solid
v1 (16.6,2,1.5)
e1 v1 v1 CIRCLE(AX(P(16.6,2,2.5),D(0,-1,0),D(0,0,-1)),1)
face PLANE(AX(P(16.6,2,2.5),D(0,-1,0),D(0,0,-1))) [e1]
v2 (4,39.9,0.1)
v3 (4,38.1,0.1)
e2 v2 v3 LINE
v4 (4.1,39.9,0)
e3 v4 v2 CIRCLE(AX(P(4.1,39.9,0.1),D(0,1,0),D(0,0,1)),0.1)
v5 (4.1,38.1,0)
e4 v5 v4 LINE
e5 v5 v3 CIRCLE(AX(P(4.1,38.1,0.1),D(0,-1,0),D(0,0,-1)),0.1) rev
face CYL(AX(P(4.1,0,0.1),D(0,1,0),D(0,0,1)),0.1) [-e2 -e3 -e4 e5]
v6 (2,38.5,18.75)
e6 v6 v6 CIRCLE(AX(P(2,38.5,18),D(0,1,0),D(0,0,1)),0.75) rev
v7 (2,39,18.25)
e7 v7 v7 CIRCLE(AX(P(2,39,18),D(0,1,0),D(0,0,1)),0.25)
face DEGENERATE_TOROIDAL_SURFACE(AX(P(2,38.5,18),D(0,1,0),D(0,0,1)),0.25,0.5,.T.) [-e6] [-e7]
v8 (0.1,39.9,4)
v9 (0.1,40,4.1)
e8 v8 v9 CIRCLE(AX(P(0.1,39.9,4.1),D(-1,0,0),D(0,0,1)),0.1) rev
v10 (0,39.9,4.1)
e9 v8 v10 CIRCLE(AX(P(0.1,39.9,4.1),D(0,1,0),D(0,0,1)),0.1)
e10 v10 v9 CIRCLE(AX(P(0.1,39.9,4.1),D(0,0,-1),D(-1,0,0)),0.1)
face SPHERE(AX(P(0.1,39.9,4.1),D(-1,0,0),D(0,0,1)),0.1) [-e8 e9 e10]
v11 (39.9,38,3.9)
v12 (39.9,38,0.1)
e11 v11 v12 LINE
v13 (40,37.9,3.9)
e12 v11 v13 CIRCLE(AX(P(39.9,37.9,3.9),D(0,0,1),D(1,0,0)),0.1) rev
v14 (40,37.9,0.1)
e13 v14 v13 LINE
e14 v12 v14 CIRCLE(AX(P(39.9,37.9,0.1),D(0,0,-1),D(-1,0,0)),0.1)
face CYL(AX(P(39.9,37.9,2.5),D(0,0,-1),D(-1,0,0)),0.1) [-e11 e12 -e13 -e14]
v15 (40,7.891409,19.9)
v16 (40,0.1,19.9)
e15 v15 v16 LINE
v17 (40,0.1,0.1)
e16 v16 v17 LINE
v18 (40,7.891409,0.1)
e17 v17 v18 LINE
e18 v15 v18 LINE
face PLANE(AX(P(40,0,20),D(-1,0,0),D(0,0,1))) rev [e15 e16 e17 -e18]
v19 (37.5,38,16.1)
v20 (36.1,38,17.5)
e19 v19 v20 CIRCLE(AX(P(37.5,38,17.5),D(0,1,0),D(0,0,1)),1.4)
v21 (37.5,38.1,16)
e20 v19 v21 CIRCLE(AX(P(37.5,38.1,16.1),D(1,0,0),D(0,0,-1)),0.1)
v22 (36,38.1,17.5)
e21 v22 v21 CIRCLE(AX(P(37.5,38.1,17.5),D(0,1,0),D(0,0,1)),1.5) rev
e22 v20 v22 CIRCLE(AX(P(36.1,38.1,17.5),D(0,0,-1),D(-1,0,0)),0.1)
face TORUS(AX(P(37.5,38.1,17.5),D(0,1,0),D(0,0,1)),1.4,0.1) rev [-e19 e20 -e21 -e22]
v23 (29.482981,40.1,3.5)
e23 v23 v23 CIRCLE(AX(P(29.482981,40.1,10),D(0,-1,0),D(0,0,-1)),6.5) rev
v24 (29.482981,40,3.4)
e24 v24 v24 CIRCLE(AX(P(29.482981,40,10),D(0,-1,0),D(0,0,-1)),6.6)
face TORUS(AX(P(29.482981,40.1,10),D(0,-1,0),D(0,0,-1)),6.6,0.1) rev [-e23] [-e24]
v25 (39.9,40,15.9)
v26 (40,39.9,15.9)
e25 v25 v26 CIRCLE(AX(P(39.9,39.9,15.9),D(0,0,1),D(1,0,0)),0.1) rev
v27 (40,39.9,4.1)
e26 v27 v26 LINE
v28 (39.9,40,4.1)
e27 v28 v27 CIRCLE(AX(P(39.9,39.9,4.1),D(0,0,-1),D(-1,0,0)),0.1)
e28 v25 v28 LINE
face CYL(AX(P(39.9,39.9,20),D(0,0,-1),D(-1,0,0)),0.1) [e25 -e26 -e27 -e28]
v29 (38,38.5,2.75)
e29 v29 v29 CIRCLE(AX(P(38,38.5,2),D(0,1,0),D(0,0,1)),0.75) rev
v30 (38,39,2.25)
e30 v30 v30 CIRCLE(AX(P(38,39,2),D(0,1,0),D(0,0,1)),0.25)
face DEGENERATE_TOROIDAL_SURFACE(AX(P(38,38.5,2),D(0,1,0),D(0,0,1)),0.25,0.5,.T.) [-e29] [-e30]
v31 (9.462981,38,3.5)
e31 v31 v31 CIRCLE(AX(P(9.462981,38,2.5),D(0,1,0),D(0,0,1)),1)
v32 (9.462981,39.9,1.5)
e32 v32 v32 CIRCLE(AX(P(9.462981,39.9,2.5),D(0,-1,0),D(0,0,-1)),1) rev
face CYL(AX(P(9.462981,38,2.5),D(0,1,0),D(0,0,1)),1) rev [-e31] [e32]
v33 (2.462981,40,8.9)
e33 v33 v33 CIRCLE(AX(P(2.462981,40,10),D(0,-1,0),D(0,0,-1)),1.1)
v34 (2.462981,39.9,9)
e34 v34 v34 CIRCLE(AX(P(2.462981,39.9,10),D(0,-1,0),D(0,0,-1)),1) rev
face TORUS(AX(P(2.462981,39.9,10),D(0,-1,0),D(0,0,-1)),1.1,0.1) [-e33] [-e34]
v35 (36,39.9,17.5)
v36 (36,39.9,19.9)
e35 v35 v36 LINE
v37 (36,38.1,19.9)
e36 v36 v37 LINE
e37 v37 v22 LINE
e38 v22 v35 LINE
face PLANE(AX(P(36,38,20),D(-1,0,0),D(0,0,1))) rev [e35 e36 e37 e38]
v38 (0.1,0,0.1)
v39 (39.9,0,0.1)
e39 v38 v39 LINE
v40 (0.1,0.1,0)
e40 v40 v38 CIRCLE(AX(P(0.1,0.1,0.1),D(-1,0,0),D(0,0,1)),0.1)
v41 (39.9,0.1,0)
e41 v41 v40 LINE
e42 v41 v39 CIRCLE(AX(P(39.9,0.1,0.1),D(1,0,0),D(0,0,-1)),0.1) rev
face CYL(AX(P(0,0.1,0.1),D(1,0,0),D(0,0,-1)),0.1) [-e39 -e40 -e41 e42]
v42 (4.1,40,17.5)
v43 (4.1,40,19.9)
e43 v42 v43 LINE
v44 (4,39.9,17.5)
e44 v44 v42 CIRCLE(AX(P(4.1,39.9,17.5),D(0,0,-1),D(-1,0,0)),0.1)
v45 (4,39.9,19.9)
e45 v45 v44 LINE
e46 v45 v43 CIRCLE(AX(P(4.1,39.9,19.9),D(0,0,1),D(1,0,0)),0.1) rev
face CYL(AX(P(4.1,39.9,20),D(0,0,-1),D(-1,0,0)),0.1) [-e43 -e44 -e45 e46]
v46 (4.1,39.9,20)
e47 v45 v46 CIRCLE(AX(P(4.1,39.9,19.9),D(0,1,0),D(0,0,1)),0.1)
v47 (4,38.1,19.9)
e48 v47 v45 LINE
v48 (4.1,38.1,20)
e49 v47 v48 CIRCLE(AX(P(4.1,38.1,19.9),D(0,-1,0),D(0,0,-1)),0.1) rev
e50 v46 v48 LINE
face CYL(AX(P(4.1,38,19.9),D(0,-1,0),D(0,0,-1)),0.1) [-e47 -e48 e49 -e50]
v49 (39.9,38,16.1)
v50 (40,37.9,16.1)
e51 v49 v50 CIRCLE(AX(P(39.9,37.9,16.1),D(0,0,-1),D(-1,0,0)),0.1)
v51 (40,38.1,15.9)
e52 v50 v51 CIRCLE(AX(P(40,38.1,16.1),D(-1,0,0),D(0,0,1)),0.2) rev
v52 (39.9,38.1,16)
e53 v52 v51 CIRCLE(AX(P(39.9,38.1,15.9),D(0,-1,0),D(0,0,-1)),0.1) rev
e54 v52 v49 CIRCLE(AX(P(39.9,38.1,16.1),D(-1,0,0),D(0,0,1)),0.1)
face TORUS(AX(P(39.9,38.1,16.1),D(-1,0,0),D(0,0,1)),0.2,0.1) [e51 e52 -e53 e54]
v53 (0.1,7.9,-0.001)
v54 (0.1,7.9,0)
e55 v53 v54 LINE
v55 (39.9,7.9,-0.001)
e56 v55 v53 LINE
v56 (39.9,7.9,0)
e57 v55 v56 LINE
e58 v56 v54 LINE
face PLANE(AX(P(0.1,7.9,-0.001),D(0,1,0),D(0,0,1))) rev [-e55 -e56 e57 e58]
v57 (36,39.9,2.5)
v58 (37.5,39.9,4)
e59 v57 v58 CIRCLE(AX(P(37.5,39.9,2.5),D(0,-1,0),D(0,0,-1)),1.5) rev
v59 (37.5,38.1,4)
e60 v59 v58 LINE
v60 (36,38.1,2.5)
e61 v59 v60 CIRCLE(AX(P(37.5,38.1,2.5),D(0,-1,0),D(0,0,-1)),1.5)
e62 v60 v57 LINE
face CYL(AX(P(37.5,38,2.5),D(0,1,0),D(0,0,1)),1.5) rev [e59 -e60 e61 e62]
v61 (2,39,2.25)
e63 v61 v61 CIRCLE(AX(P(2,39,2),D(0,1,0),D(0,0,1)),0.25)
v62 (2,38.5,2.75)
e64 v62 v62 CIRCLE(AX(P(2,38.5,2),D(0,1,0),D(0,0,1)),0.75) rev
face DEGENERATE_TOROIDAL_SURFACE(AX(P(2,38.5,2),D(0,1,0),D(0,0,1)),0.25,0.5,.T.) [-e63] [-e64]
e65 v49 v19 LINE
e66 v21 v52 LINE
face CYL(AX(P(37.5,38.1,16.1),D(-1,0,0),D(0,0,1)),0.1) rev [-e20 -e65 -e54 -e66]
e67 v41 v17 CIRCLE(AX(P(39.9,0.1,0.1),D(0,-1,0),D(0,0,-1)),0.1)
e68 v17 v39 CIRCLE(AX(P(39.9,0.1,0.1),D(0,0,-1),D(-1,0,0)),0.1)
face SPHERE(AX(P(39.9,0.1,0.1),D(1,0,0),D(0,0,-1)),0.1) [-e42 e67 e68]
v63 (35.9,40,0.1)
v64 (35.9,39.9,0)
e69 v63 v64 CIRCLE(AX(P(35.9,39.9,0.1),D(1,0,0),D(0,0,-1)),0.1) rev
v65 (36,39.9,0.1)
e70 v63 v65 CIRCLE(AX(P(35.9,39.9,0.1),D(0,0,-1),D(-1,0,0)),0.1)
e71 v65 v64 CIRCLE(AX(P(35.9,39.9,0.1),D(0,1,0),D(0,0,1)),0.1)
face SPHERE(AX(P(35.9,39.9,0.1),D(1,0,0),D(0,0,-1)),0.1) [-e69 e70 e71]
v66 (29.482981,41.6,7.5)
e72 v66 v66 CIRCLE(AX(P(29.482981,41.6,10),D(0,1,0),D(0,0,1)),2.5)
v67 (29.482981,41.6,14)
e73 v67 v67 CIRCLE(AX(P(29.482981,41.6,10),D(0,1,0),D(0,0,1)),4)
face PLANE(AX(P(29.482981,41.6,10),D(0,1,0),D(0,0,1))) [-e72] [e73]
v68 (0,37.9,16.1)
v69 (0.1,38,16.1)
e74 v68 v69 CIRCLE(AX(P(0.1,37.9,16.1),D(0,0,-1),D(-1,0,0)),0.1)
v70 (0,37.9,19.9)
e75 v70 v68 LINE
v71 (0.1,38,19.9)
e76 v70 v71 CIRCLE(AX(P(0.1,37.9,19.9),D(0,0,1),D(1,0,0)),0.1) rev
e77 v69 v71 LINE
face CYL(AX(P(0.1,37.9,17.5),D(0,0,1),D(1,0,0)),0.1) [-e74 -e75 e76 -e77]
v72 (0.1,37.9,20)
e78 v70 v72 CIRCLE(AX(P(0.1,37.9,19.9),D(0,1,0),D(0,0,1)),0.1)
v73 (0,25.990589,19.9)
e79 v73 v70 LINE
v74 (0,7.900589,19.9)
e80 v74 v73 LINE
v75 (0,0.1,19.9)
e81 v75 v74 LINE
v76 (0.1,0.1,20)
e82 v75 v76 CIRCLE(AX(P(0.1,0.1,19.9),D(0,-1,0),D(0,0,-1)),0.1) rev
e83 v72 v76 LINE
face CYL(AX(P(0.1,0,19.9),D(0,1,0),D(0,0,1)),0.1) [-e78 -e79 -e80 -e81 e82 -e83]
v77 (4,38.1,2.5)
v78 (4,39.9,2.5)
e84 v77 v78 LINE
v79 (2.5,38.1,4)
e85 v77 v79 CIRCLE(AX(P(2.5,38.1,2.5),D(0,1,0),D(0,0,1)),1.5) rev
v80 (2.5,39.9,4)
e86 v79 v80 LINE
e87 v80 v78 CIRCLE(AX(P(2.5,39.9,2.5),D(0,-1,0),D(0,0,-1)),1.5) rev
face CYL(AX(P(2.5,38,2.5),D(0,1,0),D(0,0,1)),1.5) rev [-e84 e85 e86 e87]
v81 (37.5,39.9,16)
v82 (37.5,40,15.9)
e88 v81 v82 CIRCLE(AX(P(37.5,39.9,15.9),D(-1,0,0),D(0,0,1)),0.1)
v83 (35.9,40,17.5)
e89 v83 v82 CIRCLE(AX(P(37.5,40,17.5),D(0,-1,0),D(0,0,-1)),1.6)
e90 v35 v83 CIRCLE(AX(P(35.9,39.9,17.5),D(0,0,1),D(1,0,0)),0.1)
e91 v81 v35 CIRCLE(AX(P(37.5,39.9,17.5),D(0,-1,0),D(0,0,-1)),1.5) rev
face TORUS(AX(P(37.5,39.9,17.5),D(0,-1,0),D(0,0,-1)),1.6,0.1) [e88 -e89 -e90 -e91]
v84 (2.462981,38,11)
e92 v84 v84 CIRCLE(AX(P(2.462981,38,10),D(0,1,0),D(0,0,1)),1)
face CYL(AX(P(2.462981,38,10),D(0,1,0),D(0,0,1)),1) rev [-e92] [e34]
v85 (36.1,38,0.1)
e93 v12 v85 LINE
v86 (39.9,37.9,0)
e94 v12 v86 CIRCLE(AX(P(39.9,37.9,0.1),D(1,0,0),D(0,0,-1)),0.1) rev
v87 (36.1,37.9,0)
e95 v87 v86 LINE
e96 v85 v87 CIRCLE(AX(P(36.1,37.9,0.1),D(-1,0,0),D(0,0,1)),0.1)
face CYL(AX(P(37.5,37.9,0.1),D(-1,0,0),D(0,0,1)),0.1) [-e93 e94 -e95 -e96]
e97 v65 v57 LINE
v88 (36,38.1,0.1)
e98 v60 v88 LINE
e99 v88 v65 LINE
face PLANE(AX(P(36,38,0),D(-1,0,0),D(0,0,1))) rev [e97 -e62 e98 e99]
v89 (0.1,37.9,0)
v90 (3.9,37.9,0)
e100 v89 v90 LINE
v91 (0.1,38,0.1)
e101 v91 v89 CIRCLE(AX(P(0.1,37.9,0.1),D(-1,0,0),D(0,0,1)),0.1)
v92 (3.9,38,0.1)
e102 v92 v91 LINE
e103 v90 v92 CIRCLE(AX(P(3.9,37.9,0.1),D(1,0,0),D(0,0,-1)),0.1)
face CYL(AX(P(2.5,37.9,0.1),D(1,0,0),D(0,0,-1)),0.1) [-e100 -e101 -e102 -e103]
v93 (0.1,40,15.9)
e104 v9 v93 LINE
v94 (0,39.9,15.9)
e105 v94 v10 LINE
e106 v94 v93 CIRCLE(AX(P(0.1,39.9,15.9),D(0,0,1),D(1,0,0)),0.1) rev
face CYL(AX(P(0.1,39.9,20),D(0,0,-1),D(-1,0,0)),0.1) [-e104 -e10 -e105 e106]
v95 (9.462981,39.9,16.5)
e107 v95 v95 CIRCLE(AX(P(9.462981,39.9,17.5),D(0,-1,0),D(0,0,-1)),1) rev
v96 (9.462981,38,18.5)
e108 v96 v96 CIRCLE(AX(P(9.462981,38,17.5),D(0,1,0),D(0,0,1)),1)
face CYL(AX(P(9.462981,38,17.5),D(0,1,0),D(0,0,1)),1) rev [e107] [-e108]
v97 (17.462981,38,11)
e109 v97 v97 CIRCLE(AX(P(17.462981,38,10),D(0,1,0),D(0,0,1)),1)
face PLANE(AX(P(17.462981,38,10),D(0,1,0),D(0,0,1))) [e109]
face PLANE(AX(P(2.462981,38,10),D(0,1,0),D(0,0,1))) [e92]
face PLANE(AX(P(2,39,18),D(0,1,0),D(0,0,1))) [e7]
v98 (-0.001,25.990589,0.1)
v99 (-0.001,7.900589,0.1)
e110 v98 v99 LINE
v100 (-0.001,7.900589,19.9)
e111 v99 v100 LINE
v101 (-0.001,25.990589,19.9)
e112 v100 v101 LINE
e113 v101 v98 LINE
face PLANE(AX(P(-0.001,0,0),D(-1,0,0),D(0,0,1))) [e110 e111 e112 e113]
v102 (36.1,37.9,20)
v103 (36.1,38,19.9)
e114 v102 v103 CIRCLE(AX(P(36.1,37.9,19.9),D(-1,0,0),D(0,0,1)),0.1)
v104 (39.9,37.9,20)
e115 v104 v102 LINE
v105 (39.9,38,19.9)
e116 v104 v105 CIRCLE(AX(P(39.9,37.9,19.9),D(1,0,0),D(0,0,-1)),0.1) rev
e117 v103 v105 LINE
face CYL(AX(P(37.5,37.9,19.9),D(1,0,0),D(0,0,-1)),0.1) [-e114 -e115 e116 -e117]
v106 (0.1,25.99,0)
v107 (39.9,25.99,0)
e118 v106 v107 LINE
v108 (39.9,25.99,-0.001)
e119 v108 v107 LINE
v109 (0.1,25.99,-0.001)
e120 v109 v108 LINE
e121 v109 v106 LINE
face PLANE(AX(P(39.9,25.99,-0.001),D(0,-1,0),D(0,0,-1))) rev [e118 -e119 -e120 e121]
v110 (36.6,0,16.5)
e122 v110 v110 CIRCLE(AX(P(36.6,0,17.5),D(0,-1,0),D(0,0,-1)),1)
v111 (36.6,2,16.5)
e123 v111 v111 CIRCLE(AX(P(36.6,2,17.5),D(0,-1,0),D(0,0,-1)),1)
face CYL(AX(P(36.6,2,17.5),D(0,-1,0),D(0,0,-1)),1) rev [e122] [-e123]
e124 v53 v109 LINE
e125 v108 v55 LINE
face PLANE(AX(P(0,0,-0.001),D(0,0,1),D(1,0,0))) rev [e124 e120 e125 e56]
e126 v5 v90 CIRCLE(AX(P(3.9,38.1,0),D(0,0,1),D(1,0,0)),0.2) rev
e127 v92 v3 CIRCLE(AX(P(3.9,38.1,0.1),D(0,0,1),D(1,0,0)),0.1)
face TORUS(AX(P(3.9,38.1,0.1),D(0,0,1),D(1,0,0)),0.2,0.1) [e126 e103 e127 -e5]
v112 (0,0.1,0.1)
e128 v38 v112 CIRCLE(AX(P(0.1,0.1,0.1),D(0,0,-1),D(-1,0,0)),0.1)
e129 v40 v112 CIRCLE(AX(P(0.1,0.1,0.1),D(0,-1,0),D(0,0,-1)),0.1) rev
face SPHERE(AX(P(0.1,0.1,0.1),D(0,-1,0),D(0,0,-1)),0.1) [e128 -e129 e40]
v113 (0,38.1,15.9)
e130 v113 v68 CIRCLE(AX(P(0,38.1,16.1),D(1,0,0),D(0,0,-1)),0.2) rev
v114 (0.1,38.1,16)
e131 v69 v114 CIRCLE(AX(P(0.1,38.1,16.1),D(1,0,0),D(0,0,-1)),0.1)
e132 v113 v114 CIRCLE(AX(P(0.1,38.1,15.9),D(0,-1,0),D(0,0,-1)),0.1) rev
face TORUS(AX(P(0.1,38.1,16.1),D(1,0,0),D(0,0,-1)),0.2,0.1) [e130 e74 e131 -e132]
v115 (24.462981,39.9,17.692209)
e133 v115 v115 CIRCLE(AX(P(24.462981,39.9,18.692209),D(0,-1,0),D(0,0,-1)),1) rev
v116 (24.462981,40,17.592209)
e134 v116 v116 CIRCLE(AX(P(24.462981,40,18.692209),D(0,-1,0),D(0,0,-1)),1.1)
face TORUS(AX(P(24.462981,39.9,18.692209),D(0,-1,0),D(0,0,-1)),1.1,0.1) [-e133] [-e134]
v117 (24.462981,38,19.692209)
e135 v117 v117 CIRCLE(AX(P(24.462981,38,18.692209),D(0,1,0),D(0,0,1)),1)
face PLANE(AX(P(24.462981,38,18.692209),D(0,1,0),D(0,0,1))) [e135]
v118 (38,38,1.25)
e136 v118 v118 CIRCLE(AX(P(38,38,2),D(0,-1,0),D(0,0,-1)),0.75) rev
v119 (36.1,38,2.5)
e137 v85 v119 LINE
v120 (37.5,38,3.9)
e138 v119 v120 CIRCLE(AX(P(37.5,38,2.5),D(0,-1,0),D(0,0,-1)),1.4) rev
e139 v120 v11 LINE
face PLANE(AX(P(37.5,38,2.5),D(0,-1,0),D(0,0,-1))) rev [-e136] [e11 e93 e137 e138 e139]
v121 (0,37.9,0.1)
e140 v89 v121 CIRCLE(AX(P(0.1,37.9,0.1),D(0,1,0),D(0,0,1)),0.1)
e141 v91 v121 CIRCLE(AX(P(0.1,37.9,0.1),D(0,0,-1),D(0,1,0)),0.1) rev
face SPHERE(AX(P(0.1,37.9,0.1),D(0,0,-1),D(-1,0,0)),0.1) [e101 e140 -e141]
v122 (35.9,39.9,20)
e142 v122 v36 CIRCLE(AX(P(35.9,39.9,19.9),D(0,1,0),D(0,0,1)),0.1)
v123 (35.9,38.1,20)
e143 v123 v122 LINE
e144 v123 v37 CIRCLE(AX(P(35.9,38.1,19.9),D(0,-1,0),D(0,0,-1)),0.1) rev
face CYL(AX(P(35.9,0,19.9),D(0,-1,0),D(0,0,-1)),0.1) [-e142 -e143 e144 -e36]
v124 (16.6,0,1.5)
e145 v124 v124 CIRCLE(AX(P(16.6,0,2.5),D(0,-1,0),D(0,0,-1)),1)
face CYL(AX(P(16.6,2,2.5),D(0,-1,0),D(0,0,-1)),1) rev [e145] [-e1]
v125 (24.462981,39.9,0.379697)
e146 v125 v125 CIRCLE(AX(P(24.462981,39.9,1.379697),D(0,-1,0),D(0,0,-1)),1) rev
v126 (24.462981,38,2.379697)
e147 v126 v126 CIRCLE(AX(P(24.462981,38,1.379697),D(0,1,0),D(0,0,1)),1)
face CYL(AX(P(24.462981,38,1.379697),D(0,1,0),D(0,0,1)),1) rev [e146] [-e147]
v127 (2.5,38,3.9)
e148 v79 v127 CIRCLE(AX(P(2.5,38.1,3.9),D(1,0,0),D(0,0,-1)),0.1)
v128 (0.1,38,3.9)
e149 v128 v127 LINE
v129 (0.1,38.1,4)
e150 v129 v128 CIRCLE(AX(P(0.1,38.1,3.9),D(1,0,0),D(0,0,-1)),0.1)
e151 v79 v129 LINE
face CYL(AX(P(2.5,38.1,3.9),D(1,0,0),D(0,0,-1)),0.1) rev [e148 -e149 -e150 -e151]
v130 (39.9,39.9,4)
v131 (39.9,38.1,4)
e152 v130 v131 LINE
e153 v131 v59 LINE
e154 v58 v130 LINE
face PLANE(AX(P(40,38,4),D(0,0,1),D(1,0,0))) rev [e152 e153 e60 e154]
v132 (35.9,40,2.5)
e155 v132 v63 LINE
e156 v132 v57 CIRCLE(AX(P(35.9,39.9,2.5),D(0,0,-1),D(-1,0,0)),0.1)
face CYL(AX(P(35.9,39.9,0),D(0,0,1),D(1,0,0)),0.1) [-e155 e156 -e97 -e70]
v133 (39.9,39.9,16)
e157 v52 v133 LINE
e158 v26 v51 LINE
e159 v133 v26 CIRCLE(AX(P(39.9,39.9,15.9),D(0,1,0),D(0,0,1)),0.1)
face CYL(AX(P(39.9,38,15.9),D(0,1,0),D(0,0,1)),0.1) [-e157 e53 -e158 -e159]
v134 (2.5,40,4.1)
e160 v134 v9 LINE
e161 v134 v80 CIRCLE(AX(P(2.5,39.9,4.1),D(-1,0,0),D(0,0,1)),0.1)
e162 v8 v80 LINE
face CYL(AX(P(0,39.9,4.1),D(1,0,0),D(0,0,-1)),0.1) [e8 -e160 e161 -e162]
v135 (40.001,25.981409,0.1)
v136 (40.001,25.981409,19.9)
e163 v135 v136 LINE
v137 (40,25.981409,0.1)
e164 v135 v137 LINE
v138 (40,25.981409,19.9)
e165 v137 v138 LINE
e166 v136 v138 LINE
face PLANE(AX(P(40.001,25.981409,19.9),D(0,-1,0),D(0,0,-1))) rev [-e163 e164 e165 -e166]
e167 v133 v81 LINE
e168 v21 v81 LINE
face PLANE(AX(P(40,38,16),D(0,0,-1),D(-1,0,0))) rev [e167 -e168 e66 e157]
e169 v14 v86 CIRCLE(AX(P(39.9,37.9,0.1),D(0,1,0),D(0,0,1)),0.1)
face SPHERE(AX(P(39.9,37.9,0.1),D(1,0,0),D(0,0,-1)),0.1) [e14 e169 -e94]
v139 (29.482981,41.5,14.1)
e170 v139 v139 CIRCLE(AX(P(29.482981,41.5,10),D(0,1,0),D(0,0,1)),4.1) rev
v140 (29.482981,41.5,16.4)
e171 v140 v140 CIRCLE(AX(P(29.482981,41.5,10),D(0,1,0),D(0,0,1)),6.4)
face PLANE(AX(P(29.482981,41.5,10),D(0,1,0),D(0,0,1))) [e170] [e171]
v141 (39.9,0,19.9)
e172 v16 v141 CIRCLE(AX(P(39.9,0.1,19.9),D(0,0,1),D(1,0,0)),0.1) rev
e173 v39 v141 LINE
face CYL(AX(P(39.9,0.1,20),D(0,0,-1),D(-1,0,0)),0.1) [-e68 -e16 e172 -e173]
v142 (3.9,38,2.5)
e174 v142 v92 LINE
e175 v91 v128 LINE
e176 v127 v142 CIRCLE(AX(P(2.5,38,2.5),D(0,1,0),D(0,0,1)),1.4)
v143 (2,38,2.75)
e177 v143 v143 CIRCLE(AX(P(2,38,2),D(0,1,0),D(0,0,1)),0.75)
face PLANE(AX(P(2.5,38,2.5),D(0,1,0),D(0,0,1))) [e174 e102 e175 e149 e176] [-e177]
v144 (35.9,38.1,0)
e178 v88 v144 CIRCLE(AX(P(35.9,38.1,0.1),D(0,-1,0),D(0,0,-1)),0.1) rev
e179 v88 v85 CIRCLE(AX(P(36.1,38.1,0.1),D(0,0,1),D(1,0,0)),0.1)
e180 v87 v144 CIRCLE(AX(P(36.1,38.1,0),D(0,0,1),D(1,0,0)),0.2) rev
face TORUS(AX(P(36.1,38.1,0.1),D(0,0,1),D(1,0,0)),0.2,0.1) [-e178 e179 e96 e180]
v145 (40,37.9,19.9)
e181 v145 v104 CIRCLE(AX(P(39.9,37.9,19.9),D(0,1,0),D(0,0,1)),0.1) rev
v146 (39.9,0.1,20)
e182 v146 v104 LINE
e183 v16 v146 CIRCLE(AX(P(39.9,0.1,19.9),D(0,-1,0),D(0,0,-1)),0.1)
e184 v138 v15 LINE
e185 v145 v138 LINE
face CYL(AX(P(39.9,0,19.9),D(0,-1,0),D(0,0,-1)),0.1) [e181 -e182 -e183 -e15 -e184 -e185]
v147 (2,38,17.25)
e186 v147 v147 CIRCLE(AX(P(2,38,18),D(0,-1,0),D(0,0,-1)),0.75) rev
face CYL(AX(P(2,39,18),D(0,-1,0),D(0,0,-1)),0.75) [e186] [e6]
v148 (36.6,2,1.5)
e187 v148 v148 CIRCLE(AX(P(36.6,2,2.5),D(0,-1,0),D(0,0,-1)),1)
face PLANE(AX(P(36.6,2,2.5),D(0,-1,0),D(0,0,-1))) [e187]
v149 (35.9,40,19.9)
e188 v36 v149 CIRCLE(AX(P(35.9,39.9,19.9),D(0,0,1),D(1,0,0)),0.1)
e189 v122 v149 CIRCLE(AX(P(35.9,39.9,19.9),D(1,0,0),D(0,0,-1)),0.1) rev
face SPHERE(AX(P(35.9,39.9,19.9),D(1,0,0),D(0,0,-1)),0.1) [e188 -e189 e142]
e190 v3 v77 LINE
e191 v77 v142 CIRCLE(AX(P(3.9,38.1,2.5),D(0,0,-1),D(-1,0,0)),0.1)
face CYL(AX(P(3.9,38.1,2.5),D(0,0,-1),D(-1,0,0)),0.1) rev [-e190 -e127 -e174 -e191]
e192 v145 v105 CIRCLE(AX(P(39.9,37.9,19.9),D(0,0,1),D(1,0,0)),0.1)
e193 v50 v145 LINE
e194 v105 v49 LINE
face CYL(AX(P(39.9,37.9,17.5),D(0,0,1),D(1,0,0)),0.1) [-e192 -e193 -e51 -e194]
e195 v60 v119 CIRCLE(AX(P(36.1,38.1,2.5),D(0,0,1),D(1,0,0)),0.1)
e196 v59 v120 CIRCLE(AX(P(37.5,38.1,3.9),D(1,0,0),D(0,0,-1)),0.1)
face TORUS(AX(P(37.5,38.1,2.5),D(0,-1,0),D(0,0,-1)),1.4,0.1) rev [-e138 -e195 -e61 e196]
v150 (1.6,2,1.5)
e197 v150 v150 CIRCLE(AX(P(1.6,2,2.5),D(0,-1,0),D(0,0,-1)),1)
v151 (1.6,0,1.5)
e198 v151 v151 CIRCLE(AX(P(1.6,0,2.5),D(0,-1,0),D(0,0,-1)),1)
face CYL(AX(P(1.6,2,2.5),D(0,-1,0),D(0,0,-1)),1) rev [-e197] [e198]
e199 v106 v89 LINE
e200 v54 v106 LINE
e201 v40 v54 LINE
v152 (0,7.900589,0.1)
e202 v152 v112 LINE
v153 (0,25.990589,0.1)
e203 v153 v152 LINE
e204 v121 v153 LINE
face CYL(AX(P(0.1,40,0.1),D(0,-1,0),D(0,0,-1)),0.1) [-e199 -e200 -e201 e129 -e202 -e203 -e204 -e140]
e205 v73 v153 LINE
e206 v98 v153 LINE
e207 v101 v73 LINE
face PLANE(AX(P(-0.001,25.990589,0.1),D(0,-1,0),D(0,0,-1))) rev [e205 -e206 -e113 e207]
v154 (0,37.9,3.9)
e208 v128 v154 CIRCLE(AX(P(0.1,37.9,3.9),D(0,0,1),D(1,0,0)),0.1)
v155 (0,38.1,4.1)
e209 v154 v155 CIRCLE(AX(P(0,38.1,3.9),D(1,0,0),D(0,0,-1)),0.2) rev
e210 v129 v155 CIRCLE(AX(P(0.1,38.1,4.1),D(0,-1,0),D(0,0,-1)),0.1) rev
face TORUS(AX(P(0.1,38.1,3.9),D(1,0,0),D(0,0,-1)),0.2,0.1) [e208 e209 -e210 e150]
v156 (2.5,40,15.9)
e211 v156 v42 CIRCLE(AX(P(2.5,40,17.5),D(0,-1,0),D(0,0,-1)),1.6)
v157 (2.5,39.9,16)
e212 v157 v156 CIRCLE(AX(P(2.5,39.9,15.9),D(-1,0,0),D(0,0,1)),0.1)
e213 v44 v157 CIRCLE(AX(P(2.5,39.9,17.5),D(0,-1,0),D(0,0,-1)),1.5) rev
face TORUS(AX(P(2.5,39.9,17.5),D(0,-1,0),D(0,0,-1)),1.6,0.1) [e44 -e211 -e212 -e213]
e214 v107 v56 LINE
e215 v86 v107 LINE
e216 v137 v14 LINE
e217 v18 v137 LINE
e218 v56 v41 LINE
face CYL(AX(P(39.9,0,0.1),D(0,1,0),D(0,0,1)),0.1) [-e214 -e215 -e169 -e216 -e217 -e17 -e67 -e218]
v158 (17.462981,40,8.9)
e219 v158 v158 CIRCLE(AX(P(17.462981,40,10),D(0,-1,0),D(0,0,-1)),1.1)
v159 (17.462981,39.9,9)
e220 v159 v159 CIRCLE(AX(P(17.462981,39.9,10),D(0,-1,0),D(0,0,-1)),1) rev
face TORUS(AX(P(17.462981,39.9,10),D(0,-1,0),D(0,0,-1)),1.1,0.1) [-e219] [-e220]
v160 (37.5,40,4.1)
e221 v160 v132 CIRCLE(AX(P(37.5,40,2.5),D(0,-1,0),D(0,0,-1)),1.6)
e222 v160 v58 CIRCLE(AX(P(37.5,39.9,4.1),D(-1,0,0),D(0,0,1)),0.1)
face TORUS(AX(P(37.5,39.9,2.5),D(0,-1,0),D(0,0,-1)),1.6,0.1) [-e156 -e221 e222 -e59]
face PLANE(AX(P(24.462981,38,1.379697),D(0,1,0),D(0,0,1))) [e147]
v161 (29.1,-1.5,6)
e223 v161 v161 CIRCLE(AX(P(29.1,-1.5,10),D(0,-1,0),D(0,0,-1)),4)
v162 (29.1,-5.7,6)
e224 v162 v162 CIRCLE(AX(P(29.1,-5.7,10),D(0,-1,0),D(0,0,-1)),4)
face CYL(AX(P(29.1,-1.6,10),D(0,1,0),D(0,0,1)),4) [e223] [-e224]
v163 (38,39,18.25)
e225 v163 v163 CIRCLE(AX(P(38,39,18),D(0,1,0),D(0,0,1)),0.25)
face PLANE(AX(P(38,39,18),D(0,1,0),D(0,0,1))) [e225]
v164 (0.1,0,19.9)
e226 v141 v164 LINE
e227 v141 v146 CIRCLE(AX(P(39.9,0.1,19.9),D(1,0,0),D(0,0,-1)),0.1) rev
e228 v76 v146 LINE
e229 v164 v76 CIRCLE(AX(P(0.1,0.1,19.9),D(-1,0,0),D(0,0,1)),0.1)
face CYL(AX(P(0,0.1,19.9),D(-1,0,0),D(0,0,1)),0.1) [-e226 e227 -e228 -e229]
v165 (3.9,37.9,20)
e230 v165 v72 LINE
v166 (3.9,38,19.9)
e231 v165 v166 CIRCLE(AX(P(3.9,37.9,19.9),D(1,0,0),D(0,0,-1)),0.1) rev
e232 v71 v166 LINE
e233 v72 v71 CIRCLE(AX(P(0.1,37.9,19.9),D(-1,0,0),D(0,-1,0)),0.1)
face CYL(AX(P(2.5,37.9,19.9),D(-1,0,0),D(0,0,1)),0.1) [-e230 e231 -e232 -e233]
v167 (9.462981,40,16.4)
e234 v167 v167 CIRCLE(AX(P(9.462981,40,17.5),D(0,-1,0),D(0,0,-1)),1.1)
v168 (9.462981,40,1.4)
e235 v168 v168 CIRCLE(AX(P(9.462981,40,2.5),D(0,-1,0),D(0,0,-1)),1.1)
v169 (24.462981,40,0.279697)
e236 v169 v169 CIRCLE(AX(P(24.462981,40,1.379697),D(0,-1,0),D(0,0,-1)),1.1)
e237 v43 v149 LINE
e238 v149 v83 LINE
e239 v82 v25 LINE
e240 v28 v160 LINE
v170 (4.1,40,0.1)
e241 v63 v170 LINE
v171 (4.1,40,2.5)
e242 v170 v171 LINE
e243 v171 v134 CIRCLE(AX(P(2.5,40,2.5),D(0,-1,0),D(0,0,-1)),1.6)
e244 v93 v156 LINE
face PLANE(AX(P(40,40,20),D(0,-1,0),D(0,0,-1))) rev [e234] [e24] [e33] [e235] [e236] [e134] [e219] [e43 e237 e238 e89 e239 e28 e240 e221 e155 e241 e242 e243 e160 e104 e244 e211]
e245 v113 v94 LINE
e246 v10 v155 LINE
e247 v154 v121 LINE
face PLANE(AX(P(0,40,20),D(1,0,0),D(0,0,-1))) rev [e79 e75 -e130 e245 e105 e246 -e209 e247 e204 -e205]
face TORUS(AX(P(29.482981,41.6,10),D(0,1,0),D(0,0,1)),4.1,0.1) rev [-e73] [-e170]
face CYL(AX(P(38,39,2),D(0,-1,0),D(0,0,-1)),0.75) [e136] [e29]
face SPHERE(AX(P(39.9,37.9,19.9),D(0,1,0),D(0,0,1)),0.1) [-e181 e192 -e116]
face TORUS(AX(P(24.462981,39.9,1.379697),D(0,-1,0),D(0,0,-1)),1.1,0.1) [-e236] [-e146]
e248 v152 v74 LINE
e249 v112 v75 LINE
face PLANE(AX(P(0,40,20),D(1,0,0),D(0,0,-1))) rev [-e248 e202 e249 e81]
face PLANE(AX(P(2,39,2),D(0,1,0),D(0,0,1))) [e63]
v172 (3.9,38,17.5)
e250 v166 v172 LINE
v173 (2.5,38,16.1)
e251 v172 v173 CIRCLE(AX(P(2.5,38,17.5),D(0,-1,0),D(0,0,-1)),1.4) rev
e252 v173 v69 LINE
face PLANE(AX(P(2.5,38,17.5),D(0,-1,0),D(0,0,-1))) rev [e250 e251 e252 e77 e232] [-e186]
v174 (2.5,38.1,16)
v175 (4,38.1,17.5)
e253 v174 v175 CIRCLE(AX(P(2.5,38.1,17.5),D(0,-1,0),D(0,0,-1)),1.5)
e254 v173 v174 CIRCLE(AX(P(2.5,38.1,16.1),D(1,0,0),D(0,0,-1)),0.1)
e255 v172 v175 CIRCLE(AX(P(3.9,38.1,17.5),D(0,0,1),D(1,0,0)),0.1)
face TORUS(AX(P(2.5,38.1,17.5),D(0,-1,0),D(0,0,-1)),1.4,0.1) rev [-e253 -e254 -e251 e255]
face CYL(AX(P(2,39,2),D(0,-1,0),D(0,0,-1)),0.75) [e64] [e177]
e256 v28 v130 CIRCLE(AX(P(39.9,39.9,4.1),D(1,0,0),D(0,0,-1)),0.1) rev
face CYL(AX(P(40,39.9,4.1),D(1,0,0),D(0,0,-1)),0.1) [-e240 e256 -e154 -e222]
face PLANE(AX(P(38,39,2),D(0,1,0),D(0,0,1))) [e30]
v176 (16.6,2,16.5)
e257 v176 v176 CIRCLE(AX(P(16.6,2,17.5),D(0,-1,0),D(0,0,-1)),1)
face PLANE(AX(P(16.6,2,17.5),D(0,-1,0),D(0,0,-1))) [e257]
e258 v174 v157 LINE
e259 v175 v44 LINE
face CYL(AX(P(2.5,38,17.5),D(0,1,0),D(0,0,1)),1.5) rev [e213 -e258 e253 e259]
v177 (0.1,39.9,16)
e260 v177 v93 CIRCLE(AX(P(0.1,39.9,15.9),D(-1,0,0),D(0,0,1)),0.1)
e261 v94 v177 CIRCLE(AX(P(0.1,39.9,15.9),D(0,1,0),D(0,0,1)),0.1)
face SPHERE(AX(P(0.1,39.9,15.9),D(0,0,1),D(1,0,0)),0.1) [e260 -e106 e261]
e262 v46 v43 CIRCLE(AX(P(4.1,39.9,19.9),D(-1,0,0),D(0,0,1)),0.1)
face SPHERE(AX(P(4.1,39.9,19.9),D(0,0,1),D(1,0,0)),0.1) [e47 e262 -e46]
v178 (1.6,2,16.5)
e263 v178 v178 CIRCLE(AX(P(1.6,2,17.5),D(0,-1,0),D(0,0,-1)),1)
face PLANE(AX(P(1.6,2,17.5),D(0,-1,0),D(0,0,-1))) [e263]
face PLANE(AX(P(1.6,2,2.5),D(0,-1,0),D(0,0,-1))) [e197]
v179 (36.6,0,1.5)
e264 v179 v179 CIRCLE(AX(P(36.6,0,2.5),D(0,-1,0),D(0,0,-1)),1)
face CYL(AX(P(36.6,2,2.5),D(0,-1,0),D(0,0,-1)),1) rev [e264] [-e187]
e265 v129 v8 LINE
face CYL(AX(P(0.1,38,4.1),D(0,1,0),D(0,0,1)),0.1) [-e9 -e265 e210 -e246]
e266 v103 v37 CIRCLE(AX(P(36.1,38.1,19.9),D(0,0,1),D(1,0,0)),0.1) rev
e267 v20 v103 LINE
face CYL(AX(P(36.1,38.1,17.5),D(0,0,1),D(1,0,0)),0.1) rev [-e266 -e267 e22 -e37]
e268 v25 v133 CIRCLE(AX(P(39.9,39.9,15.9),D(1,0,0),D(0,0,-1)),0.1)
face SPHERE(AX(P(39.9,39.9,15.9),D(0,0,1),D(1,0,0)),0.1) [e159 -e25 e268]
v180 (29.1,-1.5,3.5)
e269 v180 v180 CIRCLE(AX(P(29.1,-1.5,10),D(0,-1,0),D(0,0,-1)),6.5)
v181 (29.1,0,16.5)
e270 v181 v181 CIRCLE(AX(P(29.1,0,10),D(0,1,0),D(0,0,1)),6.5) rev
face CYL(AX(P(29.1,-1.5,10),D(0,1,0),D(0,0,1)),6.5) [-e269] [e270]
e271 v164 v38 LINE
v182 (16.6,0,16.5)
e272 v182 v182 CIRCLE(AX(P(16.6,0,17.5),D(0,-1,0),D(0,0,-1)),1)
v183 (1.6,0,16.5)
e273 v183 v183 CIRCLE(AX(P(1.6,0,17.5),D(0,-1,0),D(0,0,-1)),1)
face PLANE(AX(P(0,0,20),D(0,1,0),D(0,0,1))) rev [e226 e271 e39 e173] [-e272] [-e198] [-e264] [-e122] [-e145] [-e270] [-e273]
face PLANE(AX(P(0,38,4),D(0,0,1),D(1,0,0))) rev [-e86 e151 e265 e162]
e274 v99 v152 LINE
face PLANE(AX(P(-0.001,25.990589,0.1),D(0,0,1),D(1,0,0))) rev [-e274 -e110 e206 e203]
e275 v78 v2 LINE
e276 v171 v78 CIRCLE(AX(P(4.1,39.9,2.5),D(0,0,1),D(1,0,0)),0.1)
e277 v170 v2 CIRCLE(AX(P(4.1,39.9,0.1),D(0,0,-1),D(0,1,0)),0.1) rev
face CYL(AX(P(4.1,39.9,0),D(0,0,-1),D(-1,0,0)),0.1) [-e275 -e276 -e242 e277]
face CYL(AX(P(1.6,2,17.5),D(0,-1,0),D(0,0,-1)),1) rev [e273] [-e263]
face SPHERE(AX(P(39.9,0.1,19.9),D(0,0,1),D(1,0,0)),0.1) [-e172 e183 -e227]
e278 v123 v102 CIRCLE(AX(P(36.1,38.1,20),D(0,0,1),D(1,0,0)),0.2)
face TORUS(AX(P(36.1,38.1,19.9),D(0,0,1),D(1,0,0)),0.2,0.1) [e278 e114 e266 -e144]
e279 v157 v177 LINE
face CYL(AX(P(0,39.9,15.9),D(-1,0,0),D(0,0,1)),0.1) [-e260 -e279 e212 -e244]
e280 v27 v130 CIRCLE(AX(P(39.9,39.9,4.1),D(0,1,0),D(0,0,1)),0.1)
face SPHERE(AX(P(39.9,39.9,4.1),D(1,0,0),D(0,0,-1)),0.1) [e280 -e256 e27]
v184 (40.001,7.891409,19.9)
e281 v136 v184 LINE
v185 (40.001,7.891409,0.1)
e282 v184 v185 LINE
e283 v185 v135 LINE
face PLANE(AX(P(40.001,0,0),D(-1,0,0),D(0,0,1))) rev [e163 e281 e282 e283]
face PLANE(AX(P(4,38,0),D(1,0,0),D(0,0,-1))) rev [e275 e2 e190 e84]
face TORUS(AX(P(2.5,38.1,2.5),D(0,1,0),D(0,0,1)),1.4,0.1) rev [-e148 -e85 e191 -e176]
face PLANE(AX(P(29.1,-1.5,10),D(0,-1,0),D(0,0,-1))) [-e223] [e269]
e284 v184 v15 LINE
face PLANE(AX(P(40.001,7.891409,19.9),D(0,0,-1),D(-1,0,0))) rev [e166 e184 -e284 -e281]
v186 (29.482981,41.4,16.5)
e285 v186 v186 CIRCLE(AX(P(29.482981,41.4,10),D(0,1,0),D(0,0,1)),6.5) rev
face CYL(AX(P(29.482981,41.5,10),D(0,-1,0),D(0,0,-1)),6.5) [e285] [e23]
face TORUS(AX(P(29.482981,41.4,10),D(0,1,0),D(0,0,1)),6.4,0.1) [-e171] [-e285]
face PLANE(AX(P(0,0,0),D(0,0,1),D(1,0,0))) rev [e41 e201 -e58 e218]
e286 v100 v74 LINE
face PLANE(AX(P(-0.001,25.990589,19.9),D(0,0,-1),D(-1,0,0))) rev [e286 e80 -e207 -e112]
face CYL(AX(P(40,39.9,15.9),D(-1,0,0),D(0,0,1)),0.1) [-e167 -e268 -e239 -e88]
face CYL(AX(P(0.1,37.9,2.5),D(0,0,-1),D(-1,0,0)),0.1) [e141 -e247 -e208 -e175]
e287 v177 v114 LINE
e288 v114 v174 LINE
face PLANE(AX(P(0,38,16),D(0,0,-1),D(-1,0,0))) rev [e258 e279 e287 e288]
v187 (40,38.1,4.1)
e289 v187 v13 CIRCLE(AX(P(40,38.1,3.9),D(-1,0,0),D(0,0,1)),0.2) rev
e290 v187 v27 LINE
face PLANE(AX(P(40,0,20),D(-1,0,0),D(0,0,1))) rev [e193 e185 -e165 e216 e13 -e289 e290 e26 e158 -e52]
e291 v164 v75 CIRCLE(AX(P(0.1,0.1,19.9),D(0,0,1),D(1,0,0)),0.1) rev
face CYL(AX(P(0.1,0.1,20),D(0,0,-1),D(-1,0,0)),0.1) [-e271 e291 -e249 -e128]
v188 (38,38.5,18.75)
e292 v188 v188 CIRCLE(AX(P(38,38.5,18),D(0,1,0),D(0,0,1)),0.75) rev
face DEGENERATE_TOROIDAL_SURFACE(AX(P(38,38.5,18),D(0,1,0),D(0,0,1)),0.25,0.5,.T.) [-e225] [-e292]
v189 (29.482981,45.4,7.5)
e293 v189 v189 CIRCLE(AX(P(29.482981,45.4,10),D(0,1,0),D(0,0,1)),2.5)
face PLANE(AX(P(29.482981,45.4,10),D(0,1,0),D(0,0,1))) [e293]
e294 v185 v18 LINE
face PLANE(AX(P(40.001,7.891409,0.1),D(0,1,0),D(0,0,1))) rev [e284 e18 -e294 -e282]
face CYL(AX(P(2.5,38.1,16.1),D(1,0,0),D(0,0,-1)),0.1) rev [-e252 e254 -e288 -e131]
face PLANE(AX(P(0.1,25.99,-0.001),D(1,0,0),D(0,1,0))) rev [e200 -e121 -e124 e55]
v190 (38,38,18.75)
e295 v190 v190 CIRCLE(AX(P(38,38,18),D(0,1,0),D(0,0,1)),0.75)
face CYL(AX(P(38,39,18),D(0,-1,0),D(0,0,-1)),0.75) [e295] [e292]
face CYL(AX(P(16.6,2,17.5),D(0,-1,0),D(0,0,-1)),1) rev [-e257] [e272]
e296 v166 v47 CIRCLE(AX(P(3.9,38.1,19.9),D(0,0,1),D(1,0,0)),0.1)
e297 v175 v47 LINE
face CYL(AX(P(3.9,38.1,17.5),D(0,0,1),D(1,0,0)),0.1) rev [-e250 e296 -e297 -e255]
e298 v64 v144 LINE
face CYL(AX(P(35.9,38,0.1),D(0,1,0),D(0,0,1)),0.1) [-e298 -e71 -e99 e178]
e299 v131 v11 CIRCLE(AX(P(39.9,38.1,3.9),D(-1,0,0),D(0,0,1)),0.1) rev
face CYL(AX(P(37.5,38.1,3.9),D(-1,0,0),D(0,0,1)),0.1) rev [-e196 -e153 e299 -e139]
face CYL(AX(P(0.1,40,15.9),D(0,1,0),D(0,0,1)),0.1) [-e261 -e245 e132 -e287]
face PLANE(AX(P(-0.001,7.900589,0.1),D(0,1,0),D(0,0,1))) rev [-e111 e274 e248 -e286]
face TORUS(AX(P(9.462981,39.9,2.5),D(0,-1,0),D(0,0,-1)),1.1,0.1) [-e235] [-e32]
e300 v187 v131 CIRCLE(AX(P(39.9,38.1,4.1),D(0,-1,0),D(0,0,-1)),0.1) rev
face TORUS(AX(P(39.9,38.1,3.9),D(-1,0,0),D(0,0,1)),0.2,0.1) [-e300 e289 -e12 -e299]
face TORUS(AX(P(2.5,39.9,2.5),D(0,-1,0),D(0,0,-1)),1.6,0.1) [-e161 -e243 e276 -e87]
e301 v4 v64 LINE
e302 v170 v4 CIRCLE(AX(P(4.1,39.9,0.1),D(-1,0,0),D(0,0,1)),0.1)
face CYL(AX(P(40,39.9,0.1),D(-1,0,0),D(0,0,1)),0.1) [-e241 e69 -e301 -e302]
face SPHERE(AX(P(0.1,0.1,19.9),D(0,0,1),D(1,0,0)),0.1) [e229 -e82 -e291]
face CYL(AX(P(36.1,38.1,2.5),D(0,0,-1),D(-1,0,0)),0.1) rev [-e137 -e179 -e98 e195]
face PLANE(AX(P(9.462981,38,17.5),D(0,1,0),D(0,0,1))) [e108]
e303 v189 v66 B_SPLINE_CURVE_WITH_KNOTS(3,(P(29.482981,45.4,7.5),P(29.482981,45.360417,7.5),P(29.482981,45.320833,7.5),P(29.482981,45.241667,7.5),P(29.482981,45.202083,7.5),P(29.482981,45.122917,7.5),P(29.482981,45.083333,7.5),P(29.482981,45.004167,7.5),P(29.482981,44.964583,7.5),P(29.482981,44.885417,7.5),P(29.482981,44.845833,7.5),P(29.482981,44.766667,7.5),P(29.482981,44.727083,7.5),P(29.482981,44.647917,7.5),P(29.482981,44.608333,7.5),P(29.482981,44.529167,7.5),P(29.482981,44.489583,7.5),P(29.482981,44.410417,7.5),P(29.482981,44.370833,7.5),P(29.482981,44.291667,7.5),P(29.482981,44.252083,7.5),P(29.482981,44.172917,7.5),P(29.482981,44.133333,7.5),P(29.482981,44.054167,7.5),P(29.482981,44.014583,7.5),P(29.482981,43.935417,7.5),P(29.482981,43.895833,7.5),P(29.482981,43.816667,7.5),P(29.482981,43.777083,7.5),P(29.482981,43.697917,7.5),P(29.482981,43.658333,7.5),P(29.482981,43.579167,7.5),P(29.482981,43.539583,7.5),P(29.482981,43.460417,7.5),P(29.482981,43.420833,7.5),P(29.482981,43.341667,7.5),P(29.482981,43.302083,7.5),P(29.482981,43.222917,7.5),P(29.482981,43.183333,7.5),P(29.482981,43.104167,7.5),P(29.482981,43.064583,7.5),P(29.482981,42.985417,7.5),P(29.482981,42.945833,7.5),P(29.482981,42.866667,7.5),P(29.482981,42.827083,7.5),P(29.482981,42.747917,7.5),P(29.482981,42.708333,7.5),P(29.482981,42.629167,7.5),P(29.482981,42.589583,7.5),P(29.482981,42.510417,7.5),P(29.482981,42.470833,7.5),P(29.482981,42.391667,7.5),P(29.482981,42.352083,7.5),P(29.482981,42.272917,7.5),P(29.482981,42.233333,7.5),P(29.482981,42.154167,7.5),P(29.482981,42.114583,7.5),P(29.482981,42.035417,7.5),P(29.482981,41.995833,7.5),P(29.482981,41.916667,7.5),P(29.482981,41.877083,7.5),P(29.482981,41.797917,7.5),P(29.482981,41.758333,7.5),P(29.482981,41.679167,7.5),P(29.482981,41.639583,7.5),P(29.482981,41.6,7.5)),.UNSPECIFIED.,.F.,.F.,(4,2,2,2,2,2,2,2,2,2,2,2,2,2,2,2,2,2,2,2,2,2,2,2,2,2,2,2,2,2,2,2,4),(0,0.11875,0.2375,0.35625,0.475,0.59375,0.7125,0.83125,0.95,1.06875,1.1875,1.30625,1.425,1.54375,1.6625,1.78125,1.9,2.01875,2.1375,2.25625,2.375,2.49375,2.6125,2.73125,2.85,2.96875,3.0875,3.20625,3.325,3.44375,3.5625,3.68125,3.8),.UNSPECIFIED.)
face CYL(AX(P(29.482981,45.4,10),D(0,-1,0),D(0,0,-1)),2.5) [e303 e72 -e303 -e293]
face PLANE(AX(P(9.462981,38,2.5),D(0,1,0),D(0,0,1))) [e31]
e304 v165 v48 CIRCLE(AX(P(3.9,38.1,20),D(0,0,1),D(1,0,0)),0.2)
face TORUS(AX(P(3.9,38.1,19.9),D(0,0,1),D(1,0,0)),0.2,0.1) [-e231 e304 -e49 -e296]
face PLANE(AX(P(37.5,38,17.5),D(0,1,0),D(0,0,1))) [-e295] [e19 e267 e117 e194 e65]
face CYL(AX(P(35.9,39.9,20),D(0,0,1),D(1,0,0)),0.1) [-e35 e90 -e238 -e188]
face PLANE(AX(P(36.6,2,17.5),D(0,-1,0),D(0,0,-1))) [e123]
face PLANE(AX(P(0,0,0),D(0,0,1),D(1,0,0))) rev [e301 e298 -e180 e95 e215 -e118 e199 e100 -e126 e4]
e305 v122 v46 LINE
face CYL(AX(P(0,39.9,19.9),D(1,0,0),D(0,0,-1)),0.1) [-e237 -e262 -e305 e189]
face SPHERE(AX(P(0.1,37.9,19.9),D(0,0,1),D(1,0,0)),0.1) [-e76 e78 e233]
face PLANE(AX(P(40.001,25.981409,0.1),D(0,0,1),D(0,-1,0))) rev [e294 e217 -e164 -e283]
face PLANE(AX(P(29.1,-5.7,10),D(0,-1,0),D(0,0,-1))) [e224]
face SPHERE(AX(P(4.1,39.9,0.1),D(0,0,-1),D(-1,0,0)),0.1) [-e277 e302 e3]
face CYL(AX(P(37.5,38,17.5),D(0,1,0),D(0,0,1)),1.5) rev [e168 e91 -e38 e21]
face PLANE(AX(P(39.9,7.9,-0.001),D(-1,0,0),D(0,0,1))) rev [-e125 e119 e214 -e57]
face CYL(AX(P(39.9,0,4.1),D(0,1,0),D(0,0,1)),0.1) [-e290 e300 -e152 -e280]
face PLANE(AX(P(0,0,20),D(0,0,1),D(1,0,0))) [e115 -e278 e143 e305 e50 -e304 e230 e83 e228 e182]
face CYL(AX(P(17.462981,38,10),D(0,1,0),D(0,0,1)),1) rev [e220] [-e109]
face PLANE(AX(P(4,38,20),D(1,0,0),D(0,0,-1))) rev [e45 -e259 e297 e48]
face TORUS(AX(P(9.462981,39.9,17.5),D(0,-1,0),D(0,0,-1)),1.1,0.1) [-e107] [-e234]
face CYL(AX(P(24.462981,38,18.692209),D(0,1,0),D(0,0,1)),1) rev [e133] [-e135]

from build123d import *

# Parameters (mm, degrees)
IZIM1_W                      = 40
IZIM1_H                      = 40
Y_KSEKLIK_EKSTR_ZYON1_DEPTH  = 20
IZIM2_R                      = 1
KES_EKSTR_ZYON1_DEPTH        = 2
IZIM3_R                      = 6.5
Y_KSEKLIK_EKSTR_ZYON2_DEPTH  = 1.5
IZIM4_R                      = 4
Y_KSEKLIK_EKSTR_ZYON3_DEPTH  = 0.1
IZIM5_R                      = 2.5
Y_KSEKLIK_EKSTR_ZYON4_DEPTH  = 3.8
RADYUS2_R                    = 0.1
RADYUS3_R                    = 0.1
RADYUS4_R                    = 0.1
IZIM7_R                      = 0.75
Y_KSEKLIK_EKSTR_ZYON5_DEPTH  = 1
RADYUS5_R                    = 0.5
L_O_ALTMA1_COUNT             = 2
L_O_ALTMA1_PITCH             = 36
L_O_ALTMA1_COUNT_DIR2        = 2
L_O_ALTMA1_PITCH_DIR2        = 16
RADYUS5_OF_L_O_ALTMA1_R      = 0.5
IZIM8_R                      = 1
KES_EKSTR_ZYON2_DEPTH        = 2
IZIM9_R                      = 6.5
Y_KSEKLIK_EKSTR_ZYON6_DEPTH  = 1.5
IZIM10_R                     = 4
Y_KSEKLIK_EKSTR_ZYON7_DEPTH  = 0.1
IZIM11_R                     = 4
Y_KSEKLIK_EKSTR_ZYON8_DEPTH  = 4.1
IZIM13_W                     = 39.8
IZIM13_H                     = 18.09
Y_KSEKLIK_EKSTR_ZYON10_DEPTH = 0.001
IZIM16_W                     = 19.8
IZIM16_H                     = 18.09
Y_KSEKLIK_EKSTR_ZYON11_DEPTH = 0.001
IZIM17_W                     = 19.8
IZIM17_H                     = 18.09
Y_KSEKLIK_EKSTR_ZYON12_DEPTH = 0.001


with BuildPart() as part:
    # Çizim1 → Yükseklik-Ekstrüzyon1 (new body)
    with BuildSketch(Plane.XY):
        with Locations((20, 20)):
            Rectangle(IZIM1_W, IZIM1_H)
    extrude(amount=Y_KSEKLIK_EKSTR_ZYON1_DEPTH)

    # Çizim2 → Kes-Ekstrüzyon1 (cut)
    with BuildSketch(Plane(origin=(0, 40, 0), x_dir=(1, 0, 0), z_dir=(0, 1, 0))):
        with Locations(Location((2.462980944, -10, 0), (0, 0, 270))):
            Circle(IZIM2_R)
        with Locations(Location((9.462980944, -17.5, 0), (0, 0, 270))):
            Circle(IZIM2_R)
        with Locations(Location((9.462980944, -2.5, 0), (0, 0, 270))):
            Circle(IZIM2_R)
        with Locations(Location((24.462980944, -1.379697159, 0), (0, 0, 270))):
            Circle(IZIM2_R)
        with Locations(Location((24.462980944, -18.692209354, 0), (0, 0, 270))):
            Circle(IZIM2_R)
        with Locations(Location((17.462980944, -10, 0), (0, 0, 270))):
            Circle(IZIM2_R)
        with BuildLine():
            Line((0, 0), (4, 0))
            Line((4, 0), (4, -2.5))
            ThreePointArc((4, -2.5), (3.560660172, -3.560660172), (2.5, -4))
            Line((2.5, -4), (0, -4))
            Line((0, -4), (0, 0))
        make_face()
        with BuildLine():
            Line((0, -20), (4, -20))
            Line((4, -20), (4, -17.5))
            ThreePointArc((4, -17.5), (3.560660172, -16.439339828), (2.5, -16))
            Line((2.5, -16), (0, -16))
            Line((0, -16), (0, -20))
        make_face()
        with BuildLine():
            Line((40, 0), (36, 0))
            Line((36, 0), (36, -2.5))
            ThreePointArc((36, -2.5), (36.439339828, -3.560660172), (37.5, -4))
            Line((37.5, -4), (40, -4))
            Line((40, -4), (40, 0))
        make_face()
        with BuildLine():
            Line((40, -20), (36, -20))
            Line((36, -20), (36, -17.5))
            ThreePointArc((36, -17.5), (36.439339828, -16.439339828), (37.5, -16))
            Line((37.5, -16), (40, -16))
            Line((40, -16), (40, -20))
        make_face()
    extrude(amount=-KES_EKSTR_ZYON1_DEPTH, mode=Mode.SUBTRACT)

    # Çizim3 → Yükseklik-Ekstrüzyon2 (add)
    with BuildSketch(Plane(origin=(0, 40, 0), x_dir=(1, 0, 0), z_dir=(0, 1, 0))):
        with Locations(Location((29.482980944, -10, 0), (0, 0, 90))):
            Circle(IZIM3_R)
    extrude(amount=Y_KSEKLIK_EKSTR_ZYON2_DEPTH)

    # Çizim4 → Yükseklik-Ekstrüzyon3 (add)
    with BuildSketch(Plane(origin=(0, 41.5, 0), x_dir=(1, 0, 0), z_dir=(0, 1, 0))):
        with Locations(Location((29.482980944, -10, 0), (0, 0, 270))):
            Circle(IZIM4_R)
    extrude(amount=Y_KSEKLIK_EKSTR_ZYON3_DEPTH)

    # Çizim5 → Yükseklik-Ekstrüzyon4 (add)
    with BuildSketch(Plane(origin=(0, 41.6, 0), x_dir=(1, 0, 0), z_dir=(0, 1, 0))):
        with Locations(Location((29.482980944, -10, 0), (0, 0, 90))):
            Circle(IZIM5_R)
    extrude(amount=Y_KSEKLIK_EKSTR_ZYON4_DEPTH)

    # Radyus2
    radyus2_edges = [part.edges().sort_by_distance(p)[0] for p in [
        (29.482980944, 41.5, 16.5),
        (29.482980944, 41.5, 6),
        (40, 19, 20),
        (0, 19, 0),
        (20, 40, 0),
        (0, 19, 20),
        (20, 40, 20),
        (0, 40, 10),
        (40, 40, 10),
        (0, 38, 18),
        (1.25, 38, 16),
        (0, 39, 16),
        (3.560660172, 38, 16.439339828),
        (4, 38, 18.75),
        (2, 38, 20),
        (4, 39, 20),
        (4, 40, 18.75),
        (3.560660172, 40, 16.439339828),
        (1.25, 40, 16),
        (40, 38, 2),
        (38.75, 38, 4),
        (40, 39, 4),
        (36.439339828, 38, 3.560660172),
        (36, 38, 1.25),
        (38, 38, 0),
        (36, 39, 0),
        (36, 40, 1.25),
        (36.439339828, 40, 3.560660172),
        (38.75, 40, 4),
        (40, 19, 0),
        (40, 38, 18),
        (40, 39, 16),
        (38, 38, 20),
        (36, 38, 18.75),
        (36, 39, 20),
        (36.439339828, 38, 16.439339828),
        (38.75, 38, 16),
        (38.75, 40, 16),
        (20, 0, 0),
        (36.439339828, 40, 16.439339828),
        (36, 40, 18.75),
        (0, 38, 2),
        (0, 39, 4),
        (2, 38, 0),
        (4, 38, 1.25),
        (4, 39, 0),
        (3.560660172, 38, 3.560660172),
        (1.25, 38, 4),
        (1.25, 40, 4),
        (3.560660172, 40, 3.560660172),
        (4, 40, 1.25),
        (40, 0, 10),
        (0, 0, 10),
        (20, 0, 20),
    ]]
    fillet(radyus2_edges, radius=RADYUS2_R - 0.0001)  # a hair under: the kernel refuses the full size

    # Radyus3
    radyus3_edges = [part.edges().sort_by_distance(p)[0] for p in [
        (2.462980944, 40, 9),
    ]]
    fillet(radyus3_edges, radius=RADYUS3_R)

    # Radyus4
    radyus4_edges = [part.edges().sort_by_distance(p)[0] for p in [
        (29.482980944, 40, 16.5),
        (24.462980944, 40, 17.692209354),
        (17.462980944, 40, 9),
        (9.462980944, 40, 1.5),
        (9.462980944, 40, 16.5),
        (24.462980944, 40, 0.379697159),
    ]]
    fillet(radyus4_edges, radius=RADYUS4_R)

    # Çizim7 → Yükseklik-Ekstrüzyon5 (add)
    with BuildSketch(Plane(origin=(0, 38, 0), x_dir=(1, 0, 0), z_dir=(0, 1, 0))):
        with Locations(Location((2, -18, 0), (0, 0, 90))):
            Circle(IZIM7_R)
    y_kseklik_ekstr_zyon5 = extrude(amount=Y_KSEKLIK_EKSTR_ZYON5_DEPTH)

    # Radyus5
    radyus5_edges = [part.edges().sort_by_distance(p)[0] for p in [
        (2, 39, 18.75),
    ]]
    fillet(radyus5_edges, radius=RADYUS5_R)

    # LÇoğaltma1: Y_kseklik-Ekstr_zyon5 2 × 2
    with Locations(*[(i * L_O_ALTMA1_PITCH, 0, -j * L_O_ALTMA1_PITCH_DIR2) for i in range(L_O_ALTMA1_COUNT) for j in range(L_O_ALTMA1_COUNT_DIR2) if (i, j) != (0, 0)]):
        add(y_kseklik_ekstr_zyon5)

    # Radyus5 of LÇoğaltma1
    radyus5_of_l_o_altma1_edges = [part.edges().sort_by_distance(p)[0] for p in [
        (2, 39, 2.75),
        (38, 39, 18.75),
        (38, 39, 2.75),
    ]]
    fillet(radyus5_of_l_o_altma1_edges, radius=RADYUS5_OF_L_O_ALTMA1_R)

    # Çizim8 → Kes-Ekstrüzyon2 (cut)
    with BuildSketch(Plane.XZ):
        with Locations(Location((1.6, 17.5, 0), (0, 0, 270))):
            Circle(IZIM8_R)
        with Locations(Location((16.6, 17.5, 0), (0, 0, 270))):
            Circle(IZIM8_R)
        with Locations(Location((16.6, 2.5, 0), (0, 0, 270))):
            Circle(IZIM8_R)
        with Locations(Location((1.6, 2.5, 0), (0, 0, 270))):
            Circle(IZIM8_R)
        with Locations(Location((36.6, 17.5, 0), (0, 0, 270))):
            Circle(IZIM8_R)
        with Locations(Location((36.6, 2.5, 0), (0, 0, 270))):
            Circle(IZIM8_R)
    extrude(amount=-KES_EKSTR_ZYON2_DEPTH, mode=Mode.SUBTRACT)

    # Çizim9 → Yükseklik-Ekstrüzyon6 (add)
    with BuildSketch(Plane.XZ):
        with Locations(Location((29.1, 10, 0), (0, 0, 90))):
            Circle(IZIM9_R)
    extrude(amount=Y_KSEKLIK_EKSTR_ZYON6_DEPTH)

    # Çizim10 → Yükseklik-Ekstrüzyon7 (add)
    with BuildSketch(Plane.XZ.offset(1.5)):
        with Locations(Location((29.1, 10, 0), (0, 0, 270))):
            Circle(IZIM10_R)
    extrude(amount=Y_KSEKLIK_EKSTR_ZYON7_DEPTH)

    # Çizim11 → Yükseklik-Ekstrüzyon8 (add)
    with BuildSketch(Plane.XZ.offset(1.6)):
        with Locations(Location((29.1, 10, 0), (0, 0, 270))):
            Circle(IZIM11_R)
    extrude(amount=Y_KSEKLIK_EKSTR_ZYON8_DEPTH)

    # Çizim13 → Yükseklik-Ekstrüzyon10 (add)
    with BuildSketch(Plane(origin=(0, 0, 0), x_dir=(-1, 0, 0), z_dir=(0, 0, -1))):
        with Locations((-20, 16.945)):
            Rectangle(IZIM13_W, IZIM13_H)
    extrude(amount=Y_KSEKLIK_EKSTR_ZYON10_DEPTH)

    # Çizim16 → Yükseklik-Ekstrüzyon11 (add)
    with BuildSketch(Plane.ZY):
        with Locations((10, 16.945589153)):
            Rectangle(IZIM16_W, IZIM16_H)
    extrude(amount=Y_KSEKLIK_EKSTR_ZYON11_DEPTH)

    # Çizim17 → Yükseklik-Ekstrüzyon12 (add)
    with BuildSketch(Plane(origin=(40, 0, 0), x_dir=(0, 0, -1), z_dir=(1, 0, 0))):
        with Locations((-10, 16.936409482)):
            Rectangle(IZIM17_W, IZIM17_H)
    extrude(amount=Y_KSEKLIK_EKSTR_ZYON12_DEPTH)


solid = part.part
